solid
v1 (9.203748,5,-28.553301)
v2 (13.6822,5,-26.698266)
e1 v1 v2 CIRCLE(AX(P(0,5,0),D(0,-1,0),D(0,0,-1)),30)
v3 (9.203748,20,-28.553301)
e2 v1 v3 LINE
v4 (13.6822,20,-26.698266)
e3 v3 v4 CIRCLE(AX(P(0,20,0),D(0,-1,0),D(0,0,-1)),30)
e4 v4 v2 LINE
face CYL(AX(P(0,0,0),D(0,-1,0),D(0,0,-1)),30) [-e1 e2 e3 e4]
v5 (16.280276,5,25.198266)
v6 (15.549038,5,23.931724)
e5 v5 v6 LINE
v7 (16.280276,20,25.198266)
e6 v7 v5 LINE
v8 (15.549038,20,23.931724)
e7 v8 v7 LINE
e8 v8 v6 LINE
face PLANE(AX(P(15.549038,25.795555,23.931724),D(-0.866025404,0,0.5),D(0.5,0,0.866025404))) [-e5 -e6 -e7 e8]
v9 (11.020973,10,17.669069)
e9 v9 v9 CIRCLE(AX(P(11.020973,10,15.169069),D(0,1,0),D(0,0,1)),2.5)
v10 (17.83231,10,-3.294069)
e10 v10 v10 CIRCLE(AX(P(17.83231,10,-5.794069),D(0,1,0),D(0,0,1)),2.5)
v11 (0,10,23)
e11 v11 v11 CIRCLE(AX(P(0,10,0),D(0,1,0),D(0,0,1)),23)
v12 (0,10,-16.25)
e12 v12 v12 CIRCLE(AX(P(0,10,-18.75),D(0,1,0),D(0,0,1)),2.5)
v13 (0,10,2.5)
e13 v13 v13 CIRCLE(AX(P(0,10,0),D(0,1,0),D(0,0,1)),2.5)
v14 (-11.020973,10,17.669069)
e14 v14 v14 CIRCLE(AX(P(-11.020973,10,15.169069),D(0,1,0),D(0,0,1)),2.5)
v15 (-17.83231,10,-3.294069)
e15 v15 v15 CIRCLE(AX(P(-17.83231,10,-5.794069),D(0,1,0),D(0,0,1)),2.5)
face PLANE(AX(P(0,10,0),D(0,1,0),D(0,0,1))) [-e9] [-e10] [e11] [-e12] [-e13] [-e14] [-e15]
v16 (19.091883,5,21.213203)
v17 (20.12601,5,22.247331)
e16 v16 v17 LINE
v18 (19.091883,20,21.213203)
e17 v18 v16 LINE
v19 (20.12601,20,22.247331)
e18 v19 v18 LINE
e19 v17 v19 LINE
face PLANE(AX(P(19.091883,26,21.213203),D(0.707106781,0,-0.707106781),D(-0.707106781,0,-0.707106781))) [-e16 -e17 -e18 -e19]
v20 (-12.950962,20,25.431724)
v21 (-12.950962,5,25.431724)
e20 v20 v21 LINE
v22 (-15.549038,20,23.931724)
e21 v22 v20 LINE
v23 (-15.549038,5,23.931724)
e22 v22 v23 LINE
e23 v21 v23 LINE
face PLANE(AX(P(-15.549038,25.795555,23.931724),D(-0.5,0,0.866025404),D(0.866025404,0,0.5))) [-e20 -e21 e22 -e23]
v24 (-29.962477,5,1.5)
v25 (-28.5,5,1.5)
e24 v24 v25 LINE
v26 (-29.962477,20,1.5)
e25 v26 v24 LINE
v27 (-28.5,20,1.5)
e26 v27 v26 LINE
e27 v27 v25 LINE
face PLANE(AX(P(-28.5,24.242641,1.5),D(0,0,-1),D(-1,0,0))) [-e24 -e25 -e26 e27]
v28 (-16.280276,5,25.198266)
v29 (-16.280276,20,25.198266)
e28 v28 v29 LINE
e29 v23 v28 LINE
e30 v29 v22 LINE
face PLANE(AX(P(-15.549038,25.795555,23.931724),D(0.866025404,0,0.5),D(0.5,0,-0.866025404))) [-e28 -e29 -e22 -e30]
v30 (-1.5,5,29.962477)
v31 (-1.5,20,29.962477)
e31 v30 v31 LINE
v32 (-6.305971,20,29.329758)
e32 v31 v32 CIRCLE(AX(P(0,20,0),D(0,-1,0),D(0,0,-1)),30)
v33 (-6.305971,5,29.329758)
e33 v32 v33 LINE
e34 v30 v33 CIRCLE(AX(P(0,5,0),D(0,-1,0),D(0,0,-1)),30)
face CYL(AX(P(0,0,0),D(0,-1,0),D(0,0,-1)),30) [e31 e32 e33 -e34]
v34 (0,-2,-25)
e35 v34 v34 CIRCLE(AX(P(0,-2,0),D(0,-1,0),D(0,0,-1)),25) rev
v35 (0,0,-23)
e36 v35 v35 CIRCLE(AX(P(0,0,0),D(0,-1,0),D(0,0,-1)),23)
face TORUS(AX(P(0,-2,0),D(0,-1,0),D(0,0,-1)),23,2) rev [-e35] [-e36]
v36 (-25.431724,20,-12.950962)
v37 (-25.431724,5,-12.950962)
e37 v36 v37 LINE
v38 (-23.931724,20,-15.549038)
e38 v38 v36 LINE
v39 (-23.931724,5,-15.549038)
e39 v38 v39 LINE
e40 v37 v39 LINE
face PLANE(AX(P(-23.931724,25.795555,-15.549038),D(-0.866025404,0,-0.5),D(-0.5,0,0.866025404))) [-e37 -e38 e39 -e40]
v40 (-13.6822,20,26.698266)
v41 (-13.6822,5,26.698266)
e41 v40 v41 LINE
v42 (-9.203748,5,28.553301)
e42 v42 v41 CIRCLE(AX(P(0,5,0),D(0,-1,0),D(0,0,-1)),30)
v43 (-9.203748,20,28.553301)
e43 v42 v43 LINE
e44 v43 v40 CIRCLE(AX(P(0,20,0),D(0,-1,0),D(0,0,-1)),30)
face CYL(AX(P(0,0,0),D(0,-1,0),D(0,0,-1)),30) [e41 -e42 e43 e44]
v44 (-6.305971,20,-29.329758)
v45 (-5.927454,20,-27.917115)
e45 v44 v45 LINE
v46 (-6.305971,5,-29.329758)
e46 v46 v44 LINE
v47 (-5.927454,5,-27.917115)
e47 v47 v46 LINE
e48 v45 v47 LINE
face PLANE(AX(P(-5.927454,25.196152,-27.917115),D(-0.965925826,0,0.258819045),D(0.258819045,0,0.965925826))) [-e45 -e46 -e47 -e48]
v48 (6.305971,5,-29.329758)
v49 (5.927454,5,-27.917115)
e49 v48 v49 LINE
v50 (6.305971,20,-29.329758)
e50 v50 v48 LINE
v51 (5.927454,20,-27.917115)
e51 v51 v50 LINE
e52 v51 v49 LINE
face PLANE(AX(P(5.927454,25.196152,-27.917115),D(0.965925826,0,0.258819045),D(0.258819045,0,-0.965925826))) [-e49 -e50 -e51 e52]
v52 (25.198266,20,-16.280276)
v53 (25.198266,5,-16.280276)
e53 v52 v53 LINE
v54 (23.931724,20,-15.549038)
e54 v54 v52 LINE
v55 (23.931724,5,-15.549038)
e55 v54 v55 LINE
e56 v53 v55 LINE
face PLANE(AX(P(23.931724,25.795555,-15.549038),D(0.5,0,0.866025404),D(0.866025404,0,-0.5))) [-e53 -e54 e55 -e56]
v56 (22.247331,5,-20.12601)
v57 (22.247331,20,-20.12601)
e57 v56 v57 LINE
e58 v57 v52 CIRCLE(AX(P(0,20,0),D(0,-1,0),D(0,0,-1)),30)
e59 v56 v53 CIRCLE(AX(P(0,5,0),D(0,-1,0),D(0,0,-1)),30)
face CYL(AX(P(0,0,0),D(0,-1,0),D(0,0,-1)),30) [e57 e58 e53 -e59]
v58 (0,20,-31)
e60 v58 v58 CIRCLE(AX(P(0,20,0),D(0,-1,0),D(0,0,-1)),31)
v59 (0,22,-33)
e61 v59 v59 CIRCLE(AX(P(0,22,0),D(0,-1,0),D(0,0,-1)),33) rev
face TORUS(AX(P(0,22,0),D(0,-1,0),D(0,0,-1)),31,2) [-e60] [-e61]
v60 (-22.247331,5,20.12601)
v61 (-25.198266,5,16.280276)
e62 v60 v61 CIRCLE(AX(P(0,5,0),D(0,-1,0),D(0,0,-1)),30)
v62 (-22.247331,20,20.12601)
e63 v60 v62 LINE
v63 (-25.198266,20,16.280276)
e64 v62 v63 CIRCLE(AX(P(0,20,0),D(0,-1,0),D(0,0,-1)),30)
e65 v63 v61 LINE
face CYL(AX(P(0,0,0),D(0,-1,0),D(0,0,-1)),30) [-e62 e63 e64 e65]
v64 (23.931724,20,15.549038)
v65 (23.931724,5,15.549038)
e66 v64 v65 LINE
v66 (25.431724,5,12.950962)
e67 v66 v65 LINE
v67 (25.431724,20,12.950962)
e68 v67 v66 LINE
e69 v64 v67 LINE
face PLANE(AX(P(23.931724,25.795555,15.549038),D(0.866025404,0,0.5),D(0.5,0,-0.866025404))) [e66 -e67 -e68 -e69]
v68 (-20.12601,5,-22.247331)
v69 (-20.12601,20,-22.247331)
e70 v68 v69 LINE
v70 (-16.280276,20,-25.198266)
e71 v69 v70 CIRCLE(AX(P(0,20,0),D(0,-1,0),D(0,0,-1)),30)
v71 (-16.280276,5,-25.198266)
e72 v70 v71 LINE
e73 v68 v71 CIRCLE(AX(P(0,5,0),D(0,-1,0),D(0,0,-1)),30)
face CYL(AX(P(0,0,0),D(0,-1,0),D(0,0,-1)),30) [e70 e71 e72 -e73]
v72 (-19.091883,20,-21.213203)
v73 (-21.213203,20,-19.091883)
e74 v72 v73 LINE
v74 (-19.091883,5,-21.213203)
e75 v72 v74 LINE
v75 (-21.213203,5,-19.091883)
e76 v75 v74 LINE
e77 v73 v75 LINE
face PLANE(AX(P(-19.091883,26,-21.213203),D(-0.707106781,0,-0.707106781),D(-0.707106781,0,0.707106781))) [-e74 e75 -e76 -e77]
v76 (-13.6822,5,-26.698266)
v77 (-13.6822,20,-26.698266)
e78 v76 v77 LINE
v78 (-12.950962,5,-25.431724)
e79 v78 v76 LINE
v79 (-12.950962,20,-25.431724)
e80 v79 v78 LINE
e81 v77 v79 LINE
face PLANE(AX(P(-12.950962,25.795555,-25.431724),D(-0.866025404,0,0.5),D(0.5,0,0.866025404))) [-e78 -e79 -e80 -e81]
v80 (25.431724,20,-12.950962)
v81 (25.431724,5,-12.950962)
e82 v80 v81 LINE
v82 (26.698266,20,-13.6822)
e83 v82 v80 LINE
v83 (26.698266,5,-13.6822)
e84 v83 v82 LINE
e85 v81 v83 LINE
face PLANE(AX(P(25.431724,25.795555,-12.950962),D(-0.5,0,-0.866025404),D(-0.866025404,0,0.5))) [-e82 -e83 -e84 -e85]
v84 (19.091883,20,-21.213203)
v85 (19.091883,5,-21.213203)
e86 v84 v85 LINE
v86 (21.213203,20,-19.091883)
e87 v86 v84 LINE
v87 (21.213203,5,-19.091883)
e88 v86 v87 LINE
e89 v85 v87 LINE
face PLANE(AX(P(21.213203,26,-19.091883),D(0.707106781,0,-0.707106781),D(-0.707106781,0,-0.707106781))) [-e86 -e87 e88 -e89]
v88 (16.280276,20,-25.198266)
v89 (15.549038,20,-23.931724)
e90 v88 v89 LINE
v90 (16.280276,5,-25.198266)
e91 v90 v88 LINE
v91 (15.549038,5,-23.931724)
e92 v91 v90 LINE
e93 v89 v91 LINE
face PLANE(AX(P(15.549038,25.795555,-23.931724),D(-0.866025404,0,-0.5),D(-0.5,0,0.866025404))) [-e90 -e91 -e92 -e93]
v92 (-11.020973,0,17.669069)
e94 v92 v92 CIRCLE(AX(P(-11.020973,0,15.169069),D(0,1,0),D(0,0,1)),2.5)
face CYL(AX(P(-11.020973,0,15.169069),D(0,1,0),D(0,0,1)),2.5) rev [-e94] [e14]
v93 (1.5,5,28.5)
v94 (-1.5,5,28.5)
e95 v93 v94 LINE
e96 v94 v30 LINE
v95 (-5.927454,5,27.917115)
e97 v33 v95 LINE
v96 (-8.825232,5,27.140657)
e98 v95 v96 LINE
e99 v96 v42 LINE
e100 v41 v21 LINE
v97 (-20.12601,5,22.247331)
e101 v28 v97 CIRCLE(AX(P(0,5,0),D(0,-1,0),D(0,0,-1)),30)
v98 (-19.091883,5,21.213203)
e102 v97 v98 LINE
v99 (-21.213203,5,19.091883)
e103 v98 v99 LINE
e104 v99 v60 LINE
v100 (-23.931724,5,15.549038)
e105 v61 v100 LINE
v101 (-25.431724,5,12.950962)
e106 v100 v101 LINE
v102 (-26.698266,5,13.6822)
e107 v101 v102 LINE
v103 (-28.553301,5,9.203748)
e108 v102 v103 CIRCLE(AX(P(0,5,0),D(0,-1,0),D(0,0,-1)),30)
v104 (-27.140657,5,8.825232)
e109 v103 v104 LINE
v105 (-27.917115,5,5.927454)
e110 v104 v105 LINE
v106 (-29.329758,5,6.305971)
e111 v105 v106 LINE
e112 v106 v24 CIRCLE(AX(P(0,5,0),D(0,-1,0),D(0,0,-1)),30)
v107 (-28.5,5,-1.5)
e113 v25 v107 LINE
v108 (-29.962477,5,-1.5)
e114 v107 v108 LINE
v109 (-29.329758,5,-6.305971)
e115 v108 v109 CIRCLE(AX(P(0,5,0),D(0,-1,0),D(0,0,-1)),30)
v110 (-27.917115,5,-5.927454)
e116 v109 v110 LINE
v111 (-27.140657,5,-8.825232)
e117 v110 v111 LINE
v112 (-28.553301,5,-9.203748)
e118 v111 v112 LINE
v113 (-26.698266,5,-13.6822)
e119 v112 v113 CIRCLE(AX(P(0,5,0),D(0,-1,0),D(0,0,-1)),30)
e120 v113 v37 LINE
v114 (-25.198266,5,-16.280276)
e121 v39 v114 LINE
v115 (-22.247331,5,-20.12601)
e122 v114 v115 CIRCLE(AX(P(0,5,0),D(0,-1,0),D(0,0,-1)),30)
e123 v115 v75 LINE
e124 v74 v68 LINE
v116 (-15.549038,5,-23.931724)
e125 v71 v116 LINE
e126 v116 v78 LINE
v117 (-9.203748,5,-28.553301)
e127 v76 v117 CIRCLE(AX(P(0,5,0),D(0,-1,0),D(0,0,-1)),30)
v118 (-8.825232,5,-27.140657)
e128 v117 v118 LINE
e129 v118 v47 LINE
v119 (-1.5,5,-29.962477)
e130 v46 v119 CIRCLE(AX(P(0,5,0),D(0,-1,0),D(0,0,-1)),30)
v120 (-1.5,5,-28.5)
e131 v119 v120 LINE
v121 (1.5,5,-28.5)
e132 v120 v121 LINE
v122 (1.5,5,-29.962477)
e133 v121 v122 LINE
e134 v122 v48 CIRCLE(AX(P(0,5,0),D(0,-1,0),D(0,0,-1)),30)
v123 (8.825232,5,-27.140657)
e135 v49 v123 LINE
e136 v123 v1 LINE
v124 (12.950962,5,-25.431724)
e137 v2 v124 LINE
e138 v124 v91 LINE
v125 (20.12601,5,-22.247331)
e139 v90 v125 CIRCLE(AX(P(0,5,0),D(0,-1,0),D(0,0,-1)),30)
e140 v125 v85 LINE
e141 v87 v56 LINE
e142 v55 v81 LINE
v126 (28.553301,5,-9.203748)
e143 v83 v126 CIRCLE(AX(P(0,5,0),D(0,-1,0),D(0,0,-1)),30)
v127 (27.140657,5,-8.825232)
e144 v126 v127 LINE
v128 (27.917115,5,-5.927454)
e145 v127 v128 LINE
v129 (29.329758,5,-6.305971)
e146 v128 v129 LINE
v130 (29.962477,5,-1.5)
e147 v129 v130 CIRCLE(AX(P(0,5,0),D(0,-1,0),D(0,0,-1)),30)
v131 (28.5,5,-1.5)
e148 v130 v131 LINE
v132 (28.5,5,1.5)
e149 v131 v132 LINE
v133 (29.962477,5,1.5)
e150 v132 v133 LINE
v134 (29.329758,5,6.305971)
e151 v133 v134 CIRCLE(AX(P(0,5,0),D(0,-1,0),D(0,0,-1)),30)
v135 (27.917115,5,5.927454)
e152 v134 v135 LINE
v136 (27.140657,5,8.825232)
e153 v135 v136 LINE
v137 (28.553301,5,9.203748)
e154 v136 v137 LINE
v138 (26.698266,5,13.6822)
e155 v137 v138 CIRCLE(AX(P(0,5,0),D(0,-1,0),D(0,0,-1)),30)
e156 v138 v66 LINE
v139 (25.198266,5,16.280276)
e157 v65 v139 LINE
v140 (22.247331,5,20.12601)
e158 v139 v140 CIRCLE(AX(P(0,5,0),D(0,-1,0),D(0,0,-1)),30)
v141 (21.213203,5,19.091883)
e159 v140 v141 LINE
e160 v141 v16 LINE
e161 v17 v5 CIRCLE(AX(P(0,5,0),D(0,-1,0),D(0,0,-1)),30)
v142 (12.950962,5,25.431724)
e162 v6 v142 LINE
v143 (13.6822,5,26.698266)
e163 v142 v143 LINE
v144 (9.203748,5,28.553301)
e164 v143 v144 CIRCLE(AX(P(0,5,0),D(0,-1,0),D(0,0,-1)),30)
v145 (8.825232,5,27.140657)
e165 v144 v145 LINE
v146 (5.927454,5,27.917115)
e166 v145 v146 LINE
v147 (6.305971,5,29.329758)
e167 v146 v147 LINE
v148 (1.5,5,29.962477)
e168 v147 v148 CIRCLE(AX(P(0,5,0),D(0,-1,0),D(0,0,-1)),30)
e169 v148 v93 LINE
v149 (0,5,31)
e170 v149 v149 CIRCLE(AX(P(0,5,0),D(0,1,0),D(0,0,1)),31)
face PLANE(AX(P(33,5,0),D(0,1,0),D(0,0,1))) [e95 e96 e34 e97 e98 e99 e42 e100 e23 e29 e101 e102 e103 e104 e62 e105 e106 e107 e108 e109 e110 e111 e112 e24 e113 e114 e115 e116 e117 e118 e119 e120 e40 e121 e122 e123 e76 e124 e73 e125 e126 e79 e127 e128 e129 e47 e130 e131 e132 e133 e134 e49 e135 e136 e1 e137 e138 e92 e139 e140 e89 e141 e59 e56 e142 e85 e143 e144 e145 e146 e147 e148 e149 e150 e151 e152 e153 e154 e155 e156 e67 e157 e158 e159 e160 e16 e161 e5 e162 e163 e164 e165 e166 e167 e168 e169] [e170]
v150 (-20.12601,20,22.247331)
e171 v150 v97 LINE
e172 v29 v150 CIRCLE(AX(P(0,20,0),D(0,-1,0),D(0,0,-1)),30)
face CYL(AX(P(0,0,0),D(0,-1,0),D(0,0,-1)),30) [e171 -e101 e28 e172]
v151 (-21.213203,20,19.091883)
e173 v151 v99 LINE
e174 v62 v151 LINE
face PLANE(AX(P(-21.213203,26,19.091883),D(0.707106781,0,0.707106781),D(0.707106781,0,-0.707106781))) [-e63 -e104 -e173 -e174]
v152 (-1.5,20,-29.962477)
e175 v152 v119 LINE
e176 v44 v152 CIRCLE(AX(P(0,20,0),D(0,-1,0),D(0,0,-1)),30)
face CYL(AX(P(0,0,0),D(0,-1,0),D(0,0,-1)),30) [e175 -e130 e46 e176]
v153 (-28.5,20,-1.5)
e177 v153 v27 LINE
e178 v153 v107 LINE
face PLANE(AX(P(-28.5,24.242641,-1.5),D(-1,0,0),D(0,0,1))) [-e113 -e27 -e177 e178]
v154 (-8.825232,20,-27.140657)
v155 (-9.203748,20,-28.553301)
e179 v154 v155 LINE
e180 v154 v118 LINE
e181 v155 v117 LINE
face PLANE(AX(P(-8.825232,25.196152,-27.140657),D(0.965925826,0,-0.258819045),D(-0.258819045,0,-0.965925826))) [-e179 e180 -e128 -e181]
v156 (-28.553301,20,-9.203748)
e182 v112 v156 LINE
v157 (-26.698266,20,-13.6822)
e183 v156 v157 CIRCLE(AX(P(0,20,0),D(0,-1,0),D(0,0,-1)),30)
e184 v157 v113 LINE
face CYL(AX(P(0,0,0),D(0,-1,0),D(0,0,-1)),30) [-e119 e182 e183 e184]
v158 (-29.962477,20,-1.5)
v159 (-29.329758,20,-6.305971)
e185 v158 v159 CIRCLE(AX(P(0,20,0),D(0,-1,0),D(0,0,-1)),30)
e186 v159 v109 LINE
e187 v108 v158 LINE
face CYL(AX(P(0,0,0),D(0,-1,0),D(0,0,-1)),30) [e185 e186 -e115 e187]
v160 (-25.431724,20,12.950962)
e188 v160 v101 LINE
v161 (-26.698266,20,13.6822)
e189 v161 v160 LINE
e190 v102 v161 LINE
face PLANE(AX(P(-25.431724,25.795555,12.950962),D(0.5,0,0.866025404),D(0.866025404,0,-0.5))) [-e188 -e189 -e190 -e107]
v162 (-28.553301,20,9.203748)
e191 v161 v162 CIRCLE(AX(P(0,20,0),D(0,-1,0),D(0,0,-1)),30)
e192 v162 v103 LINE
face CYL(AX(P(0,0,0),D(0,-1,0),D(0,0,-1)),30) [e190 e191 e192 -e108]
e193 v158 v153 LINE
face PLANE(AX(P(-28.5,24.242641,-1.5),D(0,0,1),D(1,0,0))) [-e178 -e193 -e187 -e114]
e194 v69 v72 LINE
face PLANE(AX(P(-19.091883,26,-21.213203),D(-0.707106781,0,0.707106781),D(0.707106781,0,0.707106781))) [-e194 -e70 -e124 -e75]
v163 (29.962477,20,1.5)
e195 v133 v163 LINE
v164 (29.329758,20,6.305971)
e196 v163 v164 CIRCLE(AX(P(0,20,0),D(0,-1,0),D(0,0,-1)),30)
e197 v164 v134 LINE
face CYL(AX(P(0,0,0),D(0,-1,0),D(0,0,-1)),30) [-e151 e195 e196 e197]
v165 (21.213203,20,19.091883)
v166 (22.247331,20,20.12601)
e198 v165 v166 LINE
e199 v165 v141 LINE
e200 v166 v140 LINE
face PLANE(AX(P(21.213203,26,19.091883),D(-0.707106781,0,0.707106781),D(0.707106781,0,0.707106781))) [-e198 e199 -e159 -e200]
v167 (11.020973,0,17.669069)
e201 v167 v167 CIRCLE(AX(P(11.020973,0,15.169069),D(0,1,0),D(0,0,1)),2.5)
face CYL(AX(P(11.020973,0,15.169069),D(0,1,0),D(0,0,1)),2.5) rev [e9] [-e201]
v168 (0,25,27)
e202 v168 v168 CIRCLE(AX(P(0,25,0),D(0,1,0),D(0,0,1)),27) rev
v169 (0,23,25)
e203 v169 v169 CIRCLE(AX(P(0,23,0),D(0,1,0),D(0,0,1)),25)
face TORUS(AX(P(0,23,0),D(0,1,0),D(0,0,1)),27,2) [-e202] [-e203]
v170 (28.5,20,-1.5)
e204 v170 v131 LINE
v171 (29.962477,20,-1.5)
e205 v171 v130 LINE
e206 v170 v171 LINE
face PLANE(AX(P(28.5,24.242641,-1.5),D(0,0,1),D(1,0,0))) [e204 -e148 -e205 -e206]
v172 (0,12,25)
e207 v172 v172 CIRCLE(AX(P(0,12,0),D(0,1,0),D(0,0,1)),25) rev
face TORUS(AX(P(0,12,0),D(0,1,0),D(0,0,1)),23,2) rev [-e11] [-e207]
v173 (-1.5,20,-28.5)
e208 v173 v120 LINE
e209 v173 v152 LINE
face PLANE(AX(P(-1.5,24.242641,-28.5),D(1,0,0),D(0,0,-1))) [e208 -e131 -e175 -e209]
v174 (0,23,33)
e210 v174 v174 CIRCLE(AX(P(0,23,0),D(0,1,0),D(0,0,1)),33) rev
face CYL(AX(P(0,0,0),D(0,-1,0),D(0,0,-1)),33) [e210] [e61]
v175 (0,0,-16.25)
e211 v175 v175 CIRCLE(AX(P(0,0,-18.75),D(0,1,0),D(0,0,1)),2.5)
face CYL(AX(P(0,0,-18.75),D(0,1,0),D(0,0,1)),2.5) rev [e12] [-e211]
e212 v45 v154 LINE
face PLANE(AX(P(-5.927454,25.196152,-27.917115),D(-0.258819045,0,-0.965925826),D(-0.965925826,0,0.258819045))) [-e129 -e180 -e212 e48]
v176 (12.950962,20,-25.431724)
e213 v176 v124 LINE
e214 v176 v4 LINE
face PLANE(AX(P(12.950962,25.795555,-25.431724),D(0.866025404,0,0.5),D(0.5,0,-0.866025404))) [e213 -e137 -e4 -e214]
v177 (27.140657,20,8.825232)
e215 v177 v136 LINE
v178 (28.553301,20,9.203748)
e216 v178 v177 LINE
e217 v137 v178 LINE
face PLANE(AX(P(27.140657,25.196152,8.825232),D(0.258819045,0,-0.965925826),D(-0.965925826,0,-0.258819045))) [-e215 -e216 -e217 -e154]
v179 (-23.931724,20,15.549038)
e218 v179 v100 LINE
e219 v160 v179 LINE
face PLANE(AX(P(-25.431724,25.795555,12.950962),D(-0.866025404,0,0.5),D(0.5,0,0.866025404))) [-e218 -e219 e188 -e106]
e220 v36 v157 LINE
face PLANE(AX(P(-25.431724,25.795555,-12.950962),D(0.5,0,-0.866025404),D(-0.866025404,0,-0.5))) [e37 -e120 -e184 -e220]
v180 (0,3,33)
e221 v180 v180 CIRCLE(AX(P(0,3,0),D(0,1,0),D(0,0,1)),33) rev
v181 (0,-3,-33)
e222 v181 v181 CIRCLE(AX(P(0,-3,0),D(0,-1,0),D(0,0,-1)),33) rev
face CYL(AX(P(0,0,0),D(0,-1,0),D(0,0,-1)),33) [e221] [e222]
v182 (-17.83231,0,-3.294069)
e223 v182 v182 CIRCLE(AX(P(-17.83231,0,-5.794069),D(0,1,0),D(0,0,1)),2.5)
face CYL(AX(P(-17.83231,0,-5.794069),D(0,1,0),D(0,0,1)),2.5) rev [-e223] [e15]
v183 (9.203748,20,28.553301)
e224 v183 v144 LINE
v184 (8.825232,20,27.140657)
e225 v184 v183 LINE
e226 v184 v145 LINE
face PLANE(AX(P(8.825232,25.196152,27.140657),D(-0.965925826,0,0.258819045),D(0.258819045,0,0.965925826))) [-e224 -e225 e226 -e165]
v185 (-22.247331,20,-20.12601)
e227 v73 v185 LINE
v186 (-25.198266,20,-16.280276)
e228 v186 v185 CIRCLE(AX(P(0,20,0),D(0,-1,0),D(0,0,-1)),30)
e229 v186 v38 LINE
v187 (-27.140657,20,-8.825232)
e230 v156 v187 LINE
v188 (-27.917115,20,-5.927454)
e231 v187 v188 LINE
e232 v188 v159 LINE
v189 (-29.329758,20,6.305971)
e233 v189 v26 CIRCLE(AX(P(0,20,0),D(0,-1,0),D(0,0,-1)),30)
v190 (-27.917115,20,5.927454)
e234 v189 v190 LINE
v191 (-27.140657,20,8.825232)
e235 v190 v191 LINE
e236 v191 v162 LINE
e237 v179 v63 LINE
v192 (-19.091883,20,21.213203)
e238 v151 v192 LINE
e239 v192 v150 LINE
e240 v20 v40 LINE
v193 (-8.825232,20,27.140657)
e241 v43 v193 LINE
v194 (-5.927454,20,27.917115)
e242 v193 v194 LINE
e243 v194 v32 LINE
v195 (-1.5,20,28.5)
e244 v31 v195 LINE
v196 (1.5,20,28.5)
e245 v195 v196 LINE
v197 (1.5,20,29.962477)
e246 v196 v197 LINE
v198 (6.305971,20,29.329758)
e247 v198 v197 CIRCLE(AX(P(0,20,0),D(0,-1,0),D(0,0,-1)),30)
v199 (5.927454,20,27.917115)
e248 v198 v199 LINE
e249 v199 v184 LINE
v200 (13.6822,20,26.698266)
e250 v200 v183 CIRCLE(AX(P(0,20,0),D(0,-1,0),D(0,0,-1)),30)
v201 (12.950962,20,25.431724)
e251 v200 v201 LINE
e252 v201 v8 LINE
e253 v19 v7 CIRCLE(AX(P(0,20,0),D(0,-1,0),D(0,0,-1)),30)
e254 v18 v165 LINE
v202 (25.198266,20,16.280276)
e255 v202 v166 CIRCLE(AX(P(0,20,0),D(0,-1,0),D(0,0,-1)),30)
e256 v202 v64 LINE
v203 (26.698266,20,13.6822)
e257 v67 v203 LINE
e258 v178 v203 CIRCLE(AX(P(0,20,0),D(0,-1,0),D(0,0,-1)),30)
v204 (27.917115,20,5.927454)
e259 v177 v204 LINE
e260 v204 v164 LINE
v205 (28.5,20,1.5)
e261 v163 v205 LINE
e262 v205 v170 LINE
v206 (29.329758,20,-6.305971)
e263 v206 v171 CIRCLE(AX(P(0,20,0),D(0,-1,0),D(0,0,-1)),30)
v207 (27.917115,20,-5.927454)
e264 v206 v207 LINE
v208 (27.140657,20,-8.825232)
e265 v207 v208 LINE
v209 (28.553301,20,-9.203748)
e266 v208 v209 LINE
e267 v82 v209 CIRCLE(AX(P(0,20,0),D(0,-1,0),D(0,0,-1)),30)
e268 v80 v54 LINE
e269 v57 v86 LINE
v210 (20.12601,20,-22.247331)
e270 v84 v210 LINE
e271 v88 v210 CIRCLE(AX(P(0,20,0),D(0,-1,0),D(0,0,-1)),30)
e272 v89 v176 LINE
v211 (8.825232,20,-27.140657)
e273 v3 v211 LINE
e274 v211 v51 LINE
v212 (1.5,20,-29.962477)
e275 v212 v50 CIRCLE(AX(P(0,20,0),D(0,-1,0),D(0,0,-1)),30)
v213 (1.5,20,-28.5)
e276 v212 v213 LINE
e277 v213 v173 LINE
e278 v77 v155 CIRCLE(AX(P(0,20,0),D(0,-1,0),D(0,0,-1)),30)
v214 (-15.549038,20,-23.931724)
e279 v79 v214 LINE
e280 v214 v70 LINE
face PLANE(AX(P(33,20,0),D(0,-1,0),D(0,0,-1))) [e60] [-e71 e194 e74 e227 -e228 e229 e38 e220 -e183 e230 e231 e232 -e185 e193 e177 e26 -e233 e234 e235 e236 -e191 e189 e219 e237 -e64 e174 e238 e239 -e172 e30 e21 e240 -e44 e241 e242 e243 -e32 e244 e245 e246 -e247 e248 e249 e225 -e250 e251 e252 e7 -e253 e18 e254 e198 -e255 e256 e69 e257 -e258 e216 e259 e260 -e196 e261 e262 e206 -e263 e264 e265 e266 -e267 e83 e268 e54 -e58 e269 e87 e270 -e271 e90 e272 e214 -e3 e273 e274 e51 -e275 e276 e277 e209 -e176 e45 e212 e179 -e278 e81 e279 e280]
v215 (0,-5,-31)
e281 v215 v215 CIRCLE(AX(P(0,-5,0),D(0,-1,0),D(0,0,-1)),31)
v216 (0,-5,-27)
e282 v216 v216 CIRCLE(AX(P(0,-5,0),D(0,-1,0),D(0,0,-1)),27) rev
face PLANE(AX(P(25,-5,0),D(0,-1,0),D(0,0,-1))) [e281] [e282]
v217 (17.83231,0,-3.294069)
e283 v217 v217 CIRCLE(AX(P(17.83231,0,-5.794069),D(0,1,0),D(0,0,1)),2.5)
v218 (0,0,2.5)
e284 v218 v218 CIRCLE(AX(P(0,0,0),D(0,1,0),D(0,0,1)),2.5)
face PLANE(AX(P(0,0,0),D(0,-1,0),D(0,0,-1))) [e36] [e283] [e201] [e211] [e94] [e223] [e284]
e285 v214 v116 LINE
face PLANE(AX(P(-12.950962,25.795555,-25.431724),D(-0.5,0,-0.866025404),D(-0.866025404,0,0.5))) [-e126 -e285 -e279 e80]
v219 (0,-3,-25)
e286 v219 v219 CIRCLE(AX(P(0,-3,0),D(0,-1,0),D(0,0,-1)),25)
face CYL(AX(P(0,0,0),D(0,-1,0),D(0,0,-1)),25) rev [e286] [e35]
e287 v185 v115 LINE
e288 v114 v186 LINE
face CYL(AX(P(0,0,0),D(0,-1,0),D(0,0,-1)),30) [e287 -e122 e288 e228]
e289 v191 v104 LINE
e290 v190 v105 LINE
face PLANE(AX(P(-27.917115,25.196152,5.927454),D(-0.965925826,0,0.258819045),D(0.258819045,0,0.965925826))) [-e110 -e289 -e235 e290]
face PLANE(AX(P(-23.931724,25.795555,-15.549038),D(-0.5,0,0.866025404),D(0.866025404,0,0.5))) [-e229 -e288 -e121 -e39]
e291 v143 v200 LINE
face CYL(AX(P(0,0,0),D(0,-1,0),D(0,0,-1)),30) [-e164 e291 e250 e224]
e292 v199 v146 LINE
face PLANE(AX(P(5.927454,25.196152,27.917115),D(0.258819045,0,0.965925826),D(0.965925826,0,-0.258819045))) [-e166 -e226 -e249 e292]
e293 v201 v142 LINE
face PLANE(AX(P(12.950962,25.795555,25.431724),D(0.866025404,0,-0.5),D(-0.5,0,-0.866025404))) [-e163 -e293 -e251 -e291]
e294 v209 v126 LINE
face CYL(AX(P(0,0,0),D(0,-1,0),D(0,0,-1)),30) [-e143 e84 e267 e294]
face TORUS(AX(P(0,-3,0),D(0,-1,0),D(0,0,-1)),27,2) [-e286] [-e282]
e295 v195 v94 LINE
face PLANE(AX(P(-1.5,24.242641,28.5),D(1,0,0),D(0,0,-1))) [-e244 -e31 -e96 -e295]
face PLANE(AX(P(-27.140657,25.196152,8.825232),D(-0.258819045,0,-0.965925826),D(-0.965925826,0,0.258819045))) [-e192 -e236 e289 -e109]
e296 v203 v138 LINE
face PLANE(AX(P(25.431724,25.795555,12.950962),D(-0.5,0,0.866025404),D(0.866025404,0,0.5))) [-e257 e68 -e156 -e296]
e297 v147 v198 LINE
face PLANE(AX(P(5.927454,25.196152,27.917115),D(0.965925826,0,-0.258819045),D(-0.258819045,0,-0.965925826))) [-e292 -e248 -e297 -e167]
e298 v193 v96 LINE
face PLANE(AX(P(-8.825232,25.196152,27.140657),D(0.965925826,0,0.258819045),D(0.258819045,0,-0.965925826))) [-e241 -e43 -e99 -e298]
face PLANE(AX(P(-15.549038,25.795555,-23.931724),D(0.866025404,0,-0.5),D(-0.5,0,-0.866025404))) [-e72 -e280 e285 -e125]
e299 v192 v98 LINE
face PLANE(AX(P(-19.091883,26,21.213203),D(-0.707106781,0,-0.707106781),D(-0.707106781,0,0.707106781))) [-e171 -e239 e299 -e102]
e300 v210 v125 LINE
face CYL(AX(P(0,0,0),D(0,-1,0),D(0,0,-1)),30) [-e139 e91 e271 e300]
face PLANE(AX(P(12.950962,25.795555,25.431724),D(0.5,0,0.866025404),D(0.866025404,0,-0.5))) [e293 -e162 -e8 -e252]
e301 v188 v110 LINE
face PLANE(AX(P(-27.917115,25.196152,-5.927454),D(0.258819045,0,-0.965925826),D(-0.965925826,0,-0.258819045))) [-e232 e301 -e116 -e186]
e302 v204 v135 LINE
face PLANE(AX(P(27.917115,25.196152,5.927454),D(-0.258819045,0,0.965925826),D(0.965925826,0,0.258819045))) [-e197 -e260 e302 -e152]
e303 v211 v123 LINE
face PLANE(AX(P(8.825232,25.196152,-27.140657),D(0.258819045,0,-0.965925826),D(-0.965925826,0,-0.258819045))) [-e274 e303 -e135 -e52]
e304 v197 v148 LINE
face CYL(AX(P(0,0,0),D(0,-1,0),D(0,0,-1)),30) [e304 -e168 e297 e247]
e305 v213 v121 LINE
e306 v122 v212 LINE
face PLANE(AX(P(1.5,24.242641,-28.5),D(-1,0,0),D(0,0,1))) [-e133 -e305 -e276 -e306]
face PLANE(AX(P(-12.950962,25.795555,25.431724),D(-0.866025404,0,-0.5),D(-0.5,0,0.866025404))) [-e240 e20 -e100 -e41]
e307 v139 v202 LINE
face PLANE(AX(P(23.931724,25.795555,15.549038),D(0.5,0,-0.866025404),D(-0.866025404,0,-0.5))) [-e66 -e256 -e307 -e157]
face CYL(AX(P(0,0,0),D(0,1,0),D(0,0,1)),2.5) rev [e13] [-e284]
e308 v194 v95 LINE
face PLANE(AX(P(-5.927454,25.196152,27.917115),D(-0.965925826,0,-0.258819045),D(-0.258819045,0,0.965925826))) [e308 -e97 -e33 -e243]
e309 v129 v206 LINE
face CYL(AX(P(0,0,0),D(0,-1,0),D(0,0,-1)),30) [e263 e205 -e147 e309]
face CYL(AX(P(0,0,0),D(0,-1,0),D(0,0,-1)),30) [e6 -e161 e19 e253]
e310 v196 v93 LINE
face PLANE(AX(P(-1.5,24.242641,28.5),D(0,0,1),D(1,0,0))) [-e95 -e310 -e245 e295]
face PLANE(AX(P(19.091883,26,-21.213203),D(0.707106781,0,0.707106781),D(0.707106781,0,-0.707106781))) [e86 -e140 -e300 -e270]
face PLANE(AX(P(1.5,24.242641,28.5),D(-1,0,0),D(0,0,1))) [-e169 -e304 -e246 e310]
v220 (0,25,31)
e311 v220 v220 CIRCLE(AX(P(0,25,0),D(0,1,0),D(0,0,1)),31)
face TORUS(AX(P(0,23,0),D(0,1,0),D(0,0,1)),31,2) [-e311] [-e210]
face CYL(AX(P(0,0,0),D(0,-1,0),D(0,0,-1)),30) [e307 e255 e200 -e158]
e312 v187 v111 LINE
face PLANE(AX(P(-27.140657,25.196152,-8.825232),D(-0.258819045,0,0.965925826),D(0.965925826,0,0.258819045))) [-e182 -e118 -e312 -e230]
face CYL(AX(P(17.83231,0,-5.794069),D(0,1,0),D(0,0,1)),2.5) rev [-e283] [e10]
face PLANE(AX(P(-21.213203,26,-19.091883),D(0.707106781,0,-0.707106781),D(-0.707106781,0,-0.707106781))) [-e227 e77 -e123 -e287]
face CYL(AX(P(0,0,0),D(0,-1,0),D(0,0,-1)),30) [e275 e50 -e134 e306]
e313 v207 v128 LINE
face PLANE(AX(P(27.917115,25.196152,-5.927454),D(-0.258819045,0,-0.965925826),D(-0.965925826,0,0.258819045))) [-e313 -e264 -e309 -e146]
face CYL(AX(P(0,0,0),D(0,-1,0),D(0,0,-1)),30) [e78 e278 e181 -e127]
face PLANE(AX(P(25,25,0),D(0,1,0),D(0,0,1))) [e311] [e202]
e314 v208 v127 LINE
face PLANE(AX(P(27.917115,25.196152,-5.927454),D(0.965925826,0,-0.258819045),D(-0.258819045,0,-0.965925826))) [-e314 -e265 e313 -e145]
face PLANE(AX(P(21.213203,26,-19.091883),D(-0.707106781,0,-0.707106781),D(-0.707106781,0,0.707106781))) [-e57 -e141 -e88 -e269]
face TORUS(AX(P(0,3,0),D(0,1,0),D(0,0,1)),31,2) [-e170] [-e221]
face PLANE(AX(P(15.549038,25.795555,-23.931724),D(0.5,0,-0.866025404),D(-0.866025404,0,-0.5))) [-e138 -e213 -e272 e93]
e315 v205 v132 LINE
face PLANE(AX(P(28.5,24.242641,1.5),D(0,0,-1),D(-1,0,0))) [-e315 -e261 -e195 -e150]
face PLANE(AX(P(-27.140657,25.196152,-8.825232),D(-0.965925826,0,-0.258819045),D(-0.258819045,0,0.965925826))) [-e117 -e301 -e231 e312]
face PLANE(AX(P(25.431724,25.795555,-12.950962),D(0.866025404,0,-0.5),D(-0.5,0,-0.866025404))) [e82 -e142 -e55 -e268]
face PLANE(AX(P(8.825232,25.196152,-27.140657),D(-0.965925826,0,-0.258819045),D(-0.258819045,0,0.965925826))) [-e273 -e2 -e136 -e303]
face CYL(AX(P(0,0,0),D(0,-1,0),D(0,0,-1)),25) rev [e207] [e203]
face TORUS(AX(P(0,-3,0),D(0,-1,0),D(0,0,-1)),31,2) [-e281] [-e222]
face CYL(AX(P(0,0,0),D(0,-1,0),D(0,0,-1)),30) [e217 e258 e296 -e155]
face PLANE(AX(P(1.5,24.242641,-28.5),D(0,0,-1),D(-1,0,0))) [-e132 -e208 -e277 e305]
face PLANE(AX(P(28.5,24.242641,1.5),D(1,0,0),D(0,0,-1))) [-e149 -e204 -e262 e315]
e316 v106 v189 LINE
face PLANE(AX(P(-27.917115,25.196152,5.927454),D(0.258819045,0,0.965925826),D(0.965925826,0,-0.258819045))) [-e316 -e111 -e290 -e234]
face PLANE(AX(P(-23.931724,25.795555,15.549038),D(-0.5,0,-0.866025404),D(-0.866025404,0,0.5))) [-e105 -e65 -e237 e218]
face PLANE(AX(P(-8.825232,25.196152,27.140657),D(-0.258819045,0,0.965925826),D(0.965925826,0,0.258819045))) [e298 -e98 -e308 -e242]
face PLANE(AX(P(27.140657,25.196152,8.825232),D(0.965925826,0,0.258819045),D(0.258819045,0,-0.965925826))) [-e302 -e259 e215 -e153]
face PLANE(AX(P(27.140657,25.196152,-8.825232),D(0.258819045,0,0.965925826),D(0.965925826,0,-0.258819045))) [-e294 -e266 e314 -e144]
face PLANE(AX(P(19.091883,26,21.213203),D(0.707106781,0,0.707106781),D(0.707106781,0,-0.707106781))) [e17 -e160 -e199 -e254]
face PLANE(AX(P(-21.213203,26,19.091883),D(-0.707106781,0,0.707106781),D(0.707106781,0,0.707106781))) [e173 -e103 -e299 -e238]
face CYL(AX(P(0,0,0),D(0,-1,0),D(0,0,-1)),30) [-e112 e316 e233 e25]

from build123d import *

# Parameters (mm, degrees)
SKETCH2_R          = 2.5
CUT_EXTRUDE1_DEPTH = 10
SKETCH3_W          = 3
SKETCH3_H          = 3
CUT_EXTRUDE2_DEPTH = 15
CIRPATTERN1_START  = 5
CIRPATTERN1_DEPTH  = 15
FILLET1_R          = 2


# Read off the part's stored shape, not the designer's step: CirPattern1
with BuildPart() as part:
    # Sketch1 → Revolve1 (revolve)
    with BuildSketch(Plane.XY, mode=Mode.PRIVATE) as revolve1_sk:
        Polygon((25, 10), (25, 25), (33, 25), (33, 20), (30, 20), (30, 5), (33, 5), (33, -5), (25, -5), (25, 0), (0, 0), (0, 10), align=None)
    revolve(revolve1_sk.sketch.rotate(Axis((0, 0, 0), (0, 1, 0)), 90), axis=Axis((0, 0, 0), (0, 1, 0)))

    # Sketch2 → Cut-Extrude1 (cut)
    with BuildSketch(Plane(origin=(0, 10, 0), x_dir=(1, 0, 0), z_dir=(0, 1, 0))):
        with Locations(Location((0, 0, 0), (0, 0, 270))):
            Circle(SKETCH2_R)
        with Locations(Location((0, 18.75, 0), (0, 0, 270))):
            Circle(SKETCH2_R)
        with Locations(Location((17.832309681, 5.794068645, 0), (0, 0, 270))):
            Circle(SKETCH2_R)
        with Locations(Location((11.02097348, -15.169068645, 0), (0, 0, 270))):
            Circle(SKETCH2_R)
        with Locations(Location((-11.02097348, -15.169068645, 0), (0, 0, 270))):
            Circle(SKETCH2_R)
        with Locations(Location((-17.832309681, 5.794068645, 0), (0, 0, 270))):
            Circle(SKETCH2_R)
    extrude(amount=-CUT_EXTRUDE1_DEPTH, mode=Mode.SUBTRACT)

    # Sketch3 → Cut-Extrude2 (cut)
    with BuildSketch(Plane(origin=(0, 5, 0), x_dir=(1, 0, 0), z_dir=(0, 1, 0))):
        with Locations((0, 30)):
            Rectangle(SKETCH3_W, SKETCH3_H)
    extrude(amount=CUT_EXTRUDE2_DEPTH, mode=Mode.SUBTRACT)

    # CirPattern1 outline → CirPattern1 (cut)
    with BuildSketch(Plane(origin=(0, 0, 0), x_dir=(1, 0, 0), z_dir=(0, 1, 0)).offset(CIRPATTERN1_START)):
        with BuildLine():
            Line((8.825231525, 27.140657482), (9.203748305, 28.553301335))
            ThreePointArc((9.203748305, 28.553301335), (7.764571353, 28.977774788), (6.305970826, 29.32975847))
            Line((6.305970826, 29.32975847), (5.927454046, 27.917114617))
            Line((5.927454046, 27.917114617), (8.825231525, 27.140657482))
        make_face()
        with BuildLine():
            Line((15.549038106, 23.931724008), (16.280276372, 25.198265838))
            ThreePointArc((16.280276372, 25.198265838), (15, 25.980762113), (13.682200161, 26.698265838))
            Line((13.682200161, 26.698265838), (12.950961894, 25.431724008))
            Line((12.950961894, 25.431724008), (15.549038106, 23.931724008))
        make_face()
        with BuildLine():
            Line((21.213203436, 19.091883092), (22.24733051, 20.126010166))
            ThreePointArc((22.24733051, 20.126010166), (21.213203436, 21.213203436), (20.126010166, 22.24733051))
            Line((20.126010166, 22.24733051), (19.091883092, 21.213203436))
            Line((19.091883092, 21.213203436), (21.213203436, 19.091883092))
        make_face()
        with BuildLine():
            Line((25.431724008, 12.950961894), (26.698265838, 13.682200161))
            ThreePointArc((26.698265838, 13.682200161), (25.980762113, 15), (25.198265838, 16.280276372))
            Line((25.198265838, 16.280276372), (23.931724008, 15.549038106))
            Line((23.931724008, 15.549038106), (25.431724008, 12.950961894))
        make_face()
        with BuildLine():
            Line((27.917114617, 5.927454046), (29.32975847, 6.305970826))
            ThreePointArc((29.32975847, 6.305970826), (28.977774789, 7.764571353), (28.553301335, 9.203748305))
            Line((28.553301335, 9.203748305), (27.140657482, 8.825231525))
            Line((27.140657482, 8.825231525), (27.917114617, 5.927454046))
        make_face()
        with BuildLine():
            Line((28.5, -1.5), (29.962476533, -1.5))
            ThreePointArc((29.962476533, -1.5), (30, 0), (29.962476533, 1.5))
            Line((29.962476533, 1.5), (28.5, 1.5))
            Line((28.5, 1.5), (28.5, -1.5))
        make_face()
        with BuildLine():
            Line((27.140657482, -8.825231525), (28.553301335, -9.203748305))
            ThreePointArc((28.553301335, -9.203748305), (28.977774789, -7.764571353), (29.329758471, -6.305970826))
            Line((29.329758471, -6.305970826), (27.917114617, -5.927454046))
            Line((27.917114617, -5.927454046), (27.140657482, -8.825231525))
        make_face()
        with BuildLine():
            Line((23.931724008, -15.549038106), (25.198265838, -16.280276372))
            ThreePointArc((25.198265838, -16.280276372), (25.980762114, -15), (26.698265838, -13.682200161))
            Line((26.698265838, -13.682200161), (25.431724008, -12.950961894))
            Line((25.431724008, -12.950961894), (23.931724008, -15.549038106))
        make_face()
        with BuildLine():
            Line((19.091883092, -21.213203436), (20.126010166, -22.24733051))
            ThreePointArc((20.126010166, -22.24733051), (21.213203436, -21.213203436), (22.24733051, -20.126010166))
            Line((22.24733051, -20.126010166), (21.213203436, -19.091883092))
            Line((21.213203436, -19.091883092), (19.091883092, -21.213203436))
        make_face()
        with BuildLine():
            Line((12.950961894, -25.431724008), (13.682200161, -26.698265838))
            ThreePointArc((13.682200161, -26.698265838), (15, -25.980762114), (16.280276372, -25.198265838))
            Line((16.280276372, -25.198265838), (15.549038106, -23.931724008))
            Line((15.549038106, -23.931724008), (12.950961894, -25.431724008))
        make_face()
        with BuildLine():
            Line((5.927454046, -27.917114617), (6.305970826, -29.329758471))
            ThreePointArc((6.305970826, -29.329758471), (7.764571353, -28.977774789), (9.203748305, -28.553301335))
            Line((9.203748305, -28.553301335), (8.825231525, -27.140657482))
            Line((8.825231525, -27.140657482), (5.927454046, -27.917114617))
        make_face()
        with BuildLine():
            ThreePointArc((-6.305970826, 29.32975847), (-7.764571353, 28.977774788), (-9.203748305, 28.553301335))
            Line((-9.203748305, 28.553301335), (-8.825231525, 27.140657482))
            Line((-8.825231525, 27.140657482), (-5.927454046, 27.917114617))
            Line((-5.927454046, 27.917114617), (-6.305970826, 29.32975847))
        make_face()
        with BuildLine():
            ThreePointArc((-13.682200161, 26.698265838), (-15, 25.980762113), (-16.280276372, 25.198265838))
            Line((-16.280276372, 25.198265838), (-15.549038106, 23.931724008))
            Line((-15.549038106, 23.931724008), (-12.950961894, 25.431724008))
            Line((-12.950961894, 25.431724008), (-13.682200161, 26.698265838))
        make_face()
        with BuildLine():
            ThreePointArc((-20.126010166, 22.24733051), (-21.213203436, 21.213203436), (-22.24733051, 20.126010166))
            Line((-22.24733051, 20.126010166), (-21.213203436, 19.091883092))
            Line((-21.213203436, 19.091883092), (-19.091883092, 21.213203436))
            Line((-19.091883092, 21.213203436), (-20.126010166, 22.24733051))
        make_face()
        with BuildLine():
            ThreePointArc((-25.198265838, 16.280276372), (-25.980762113, 15), (-26.698265838, 13.682200161))
            Line((-26.698265838, 13.682200161), (-25.431724008, 12.950961894))
            Line((-25.431724008, 12.950961894), (-23.931724008, 15.549038106))
            Line((-23.931724008, 15.549038106), (-25.198265838, 16.280276372))
        make_face()
        with BuildLine():
            ThreePointArc((-28.553301335, 9.203748305), (-28.977774789, 7.764571353), (-29.32975847, 6.305970826))
            Line((-29.32975847, 6.305970826), (-27.917114617, 5.927454046))
            Line((-27.917114617, 5.927454046), (-27.140657482, 8.825231525))
            Line((-27.140657482, 8.825231525), (-28.553301335, 9.203748305))
        make_face()
        with BuildLine():
            ThreePointArc((-29.962476533, 1.5), (-30, 0), (-29.962476533, -1.5))
            Line((-29.962476533, -1.5), (-28.5, -1.5))
            Line((-28.5, -1.5), (-28.5, 1.5))
            Line((-28.5, 1.5), (-29.962476533, 1.5))
        make_face()
        with BuildLine():
            ThreePointArc((-29.329758471, -6.305970826), (-28.977774789, -7.764571353), (-28.553301335, -9.203748305))
            Line((-28.553301335, -9.203748305), (-27.140657482, -8.825231525))
            Line((-27.140657482, -8.825231525), (-27.917114617, -5.927454046))
            Line((-27.917114617, -5.927454046), (-29.329758471, -6.305970826))
        make_face()
        with BuildLine():
            ThreePointArc((-26.698265838, -13.682200161), (-25.980762114, -15), (-25.198265838, -16.280276372))
            Line((-25.198265838, -16.280276372), (-23.931724008, -15.549038106))
            Line((-23.931724008, -15.549038106), (-25.431724008, -12.950961894))
            Line((-25.431724008, -12.950961894), (-26.698265838, -13.682200161))
        make_face()
        with BuildLine():
            ThreePointArc((-22.24733051, -20.126010166), (-21.213203436, -21.213203436), (-20.126010166, -22.24733051))
            Line((-20.126010166, -22.24733051), (-19.091883092, -21.213203436))
            Line((-19.091883092, -21.213203436), (-21.213203436, -19.091883092))
            Line((-21.213203436, -19.091883092), (-22.24733051, -20.126010166))
        make_face()
        with BuildLine():
            ThreePointArc((-16.280276372, -25.198265838), (-15, -25.980762114), (-13.682200161, -26.698265838))
            Line((-13.682200161, -26.698265838), (-12.950961894, -25.431724008))
            Line((-12.950961894, -25.431724008), (-15.549038106, -23.931724008))
            Line((-15.549038106, -23.931724008), (-16.280276372, -25.198265838))
        make_face()
        with BuildLine():
            ThreePointArc((-9.203748305, -28.553301335), (-7.764571353, -28.977774789), (-6.305970826, -29.329758471))
            Line((-6.305970826, -29.329758471), (-5.927454046, -27.917114617))
            Line((-5.927454046, -27.917114617), (-8.825231525, -27.140657482))
            Line((-8.825231525, -27.140657482), (-9.203748305, -28.553301335))
        make_face()
        with BuildLine():
            Line((1.5, -29.962476533), (1.5, -28.5))
            Line((1.5, -28.5), (-1.5, -28.5))
            Line((-1.5, -28.5), (-1.5, -29.962476533))
            ThreePointArc((-1.5, -29.962476533), (0, -30), (1.5, -29.962476533))
        make_face()
    extrude(amount=CIRPATTERN1_DEPTH, mode=Mode.SUBTRACT)

    # Fillet1
    fillet1_edges = [part.edges().sort_by_distance(p)[0] for p in [
        (0, -5, 25),
        (0, -5, 33),
        (0, 5, 33),
        (0, 20, 33),
        (0, 25, 33),
        (0, 25, 25),
        (0, 10, 25),
        (0, 0, 25),
    ]]
    fillet(fillet1_edges, radius=FILLET1_R)


solid = part.part
